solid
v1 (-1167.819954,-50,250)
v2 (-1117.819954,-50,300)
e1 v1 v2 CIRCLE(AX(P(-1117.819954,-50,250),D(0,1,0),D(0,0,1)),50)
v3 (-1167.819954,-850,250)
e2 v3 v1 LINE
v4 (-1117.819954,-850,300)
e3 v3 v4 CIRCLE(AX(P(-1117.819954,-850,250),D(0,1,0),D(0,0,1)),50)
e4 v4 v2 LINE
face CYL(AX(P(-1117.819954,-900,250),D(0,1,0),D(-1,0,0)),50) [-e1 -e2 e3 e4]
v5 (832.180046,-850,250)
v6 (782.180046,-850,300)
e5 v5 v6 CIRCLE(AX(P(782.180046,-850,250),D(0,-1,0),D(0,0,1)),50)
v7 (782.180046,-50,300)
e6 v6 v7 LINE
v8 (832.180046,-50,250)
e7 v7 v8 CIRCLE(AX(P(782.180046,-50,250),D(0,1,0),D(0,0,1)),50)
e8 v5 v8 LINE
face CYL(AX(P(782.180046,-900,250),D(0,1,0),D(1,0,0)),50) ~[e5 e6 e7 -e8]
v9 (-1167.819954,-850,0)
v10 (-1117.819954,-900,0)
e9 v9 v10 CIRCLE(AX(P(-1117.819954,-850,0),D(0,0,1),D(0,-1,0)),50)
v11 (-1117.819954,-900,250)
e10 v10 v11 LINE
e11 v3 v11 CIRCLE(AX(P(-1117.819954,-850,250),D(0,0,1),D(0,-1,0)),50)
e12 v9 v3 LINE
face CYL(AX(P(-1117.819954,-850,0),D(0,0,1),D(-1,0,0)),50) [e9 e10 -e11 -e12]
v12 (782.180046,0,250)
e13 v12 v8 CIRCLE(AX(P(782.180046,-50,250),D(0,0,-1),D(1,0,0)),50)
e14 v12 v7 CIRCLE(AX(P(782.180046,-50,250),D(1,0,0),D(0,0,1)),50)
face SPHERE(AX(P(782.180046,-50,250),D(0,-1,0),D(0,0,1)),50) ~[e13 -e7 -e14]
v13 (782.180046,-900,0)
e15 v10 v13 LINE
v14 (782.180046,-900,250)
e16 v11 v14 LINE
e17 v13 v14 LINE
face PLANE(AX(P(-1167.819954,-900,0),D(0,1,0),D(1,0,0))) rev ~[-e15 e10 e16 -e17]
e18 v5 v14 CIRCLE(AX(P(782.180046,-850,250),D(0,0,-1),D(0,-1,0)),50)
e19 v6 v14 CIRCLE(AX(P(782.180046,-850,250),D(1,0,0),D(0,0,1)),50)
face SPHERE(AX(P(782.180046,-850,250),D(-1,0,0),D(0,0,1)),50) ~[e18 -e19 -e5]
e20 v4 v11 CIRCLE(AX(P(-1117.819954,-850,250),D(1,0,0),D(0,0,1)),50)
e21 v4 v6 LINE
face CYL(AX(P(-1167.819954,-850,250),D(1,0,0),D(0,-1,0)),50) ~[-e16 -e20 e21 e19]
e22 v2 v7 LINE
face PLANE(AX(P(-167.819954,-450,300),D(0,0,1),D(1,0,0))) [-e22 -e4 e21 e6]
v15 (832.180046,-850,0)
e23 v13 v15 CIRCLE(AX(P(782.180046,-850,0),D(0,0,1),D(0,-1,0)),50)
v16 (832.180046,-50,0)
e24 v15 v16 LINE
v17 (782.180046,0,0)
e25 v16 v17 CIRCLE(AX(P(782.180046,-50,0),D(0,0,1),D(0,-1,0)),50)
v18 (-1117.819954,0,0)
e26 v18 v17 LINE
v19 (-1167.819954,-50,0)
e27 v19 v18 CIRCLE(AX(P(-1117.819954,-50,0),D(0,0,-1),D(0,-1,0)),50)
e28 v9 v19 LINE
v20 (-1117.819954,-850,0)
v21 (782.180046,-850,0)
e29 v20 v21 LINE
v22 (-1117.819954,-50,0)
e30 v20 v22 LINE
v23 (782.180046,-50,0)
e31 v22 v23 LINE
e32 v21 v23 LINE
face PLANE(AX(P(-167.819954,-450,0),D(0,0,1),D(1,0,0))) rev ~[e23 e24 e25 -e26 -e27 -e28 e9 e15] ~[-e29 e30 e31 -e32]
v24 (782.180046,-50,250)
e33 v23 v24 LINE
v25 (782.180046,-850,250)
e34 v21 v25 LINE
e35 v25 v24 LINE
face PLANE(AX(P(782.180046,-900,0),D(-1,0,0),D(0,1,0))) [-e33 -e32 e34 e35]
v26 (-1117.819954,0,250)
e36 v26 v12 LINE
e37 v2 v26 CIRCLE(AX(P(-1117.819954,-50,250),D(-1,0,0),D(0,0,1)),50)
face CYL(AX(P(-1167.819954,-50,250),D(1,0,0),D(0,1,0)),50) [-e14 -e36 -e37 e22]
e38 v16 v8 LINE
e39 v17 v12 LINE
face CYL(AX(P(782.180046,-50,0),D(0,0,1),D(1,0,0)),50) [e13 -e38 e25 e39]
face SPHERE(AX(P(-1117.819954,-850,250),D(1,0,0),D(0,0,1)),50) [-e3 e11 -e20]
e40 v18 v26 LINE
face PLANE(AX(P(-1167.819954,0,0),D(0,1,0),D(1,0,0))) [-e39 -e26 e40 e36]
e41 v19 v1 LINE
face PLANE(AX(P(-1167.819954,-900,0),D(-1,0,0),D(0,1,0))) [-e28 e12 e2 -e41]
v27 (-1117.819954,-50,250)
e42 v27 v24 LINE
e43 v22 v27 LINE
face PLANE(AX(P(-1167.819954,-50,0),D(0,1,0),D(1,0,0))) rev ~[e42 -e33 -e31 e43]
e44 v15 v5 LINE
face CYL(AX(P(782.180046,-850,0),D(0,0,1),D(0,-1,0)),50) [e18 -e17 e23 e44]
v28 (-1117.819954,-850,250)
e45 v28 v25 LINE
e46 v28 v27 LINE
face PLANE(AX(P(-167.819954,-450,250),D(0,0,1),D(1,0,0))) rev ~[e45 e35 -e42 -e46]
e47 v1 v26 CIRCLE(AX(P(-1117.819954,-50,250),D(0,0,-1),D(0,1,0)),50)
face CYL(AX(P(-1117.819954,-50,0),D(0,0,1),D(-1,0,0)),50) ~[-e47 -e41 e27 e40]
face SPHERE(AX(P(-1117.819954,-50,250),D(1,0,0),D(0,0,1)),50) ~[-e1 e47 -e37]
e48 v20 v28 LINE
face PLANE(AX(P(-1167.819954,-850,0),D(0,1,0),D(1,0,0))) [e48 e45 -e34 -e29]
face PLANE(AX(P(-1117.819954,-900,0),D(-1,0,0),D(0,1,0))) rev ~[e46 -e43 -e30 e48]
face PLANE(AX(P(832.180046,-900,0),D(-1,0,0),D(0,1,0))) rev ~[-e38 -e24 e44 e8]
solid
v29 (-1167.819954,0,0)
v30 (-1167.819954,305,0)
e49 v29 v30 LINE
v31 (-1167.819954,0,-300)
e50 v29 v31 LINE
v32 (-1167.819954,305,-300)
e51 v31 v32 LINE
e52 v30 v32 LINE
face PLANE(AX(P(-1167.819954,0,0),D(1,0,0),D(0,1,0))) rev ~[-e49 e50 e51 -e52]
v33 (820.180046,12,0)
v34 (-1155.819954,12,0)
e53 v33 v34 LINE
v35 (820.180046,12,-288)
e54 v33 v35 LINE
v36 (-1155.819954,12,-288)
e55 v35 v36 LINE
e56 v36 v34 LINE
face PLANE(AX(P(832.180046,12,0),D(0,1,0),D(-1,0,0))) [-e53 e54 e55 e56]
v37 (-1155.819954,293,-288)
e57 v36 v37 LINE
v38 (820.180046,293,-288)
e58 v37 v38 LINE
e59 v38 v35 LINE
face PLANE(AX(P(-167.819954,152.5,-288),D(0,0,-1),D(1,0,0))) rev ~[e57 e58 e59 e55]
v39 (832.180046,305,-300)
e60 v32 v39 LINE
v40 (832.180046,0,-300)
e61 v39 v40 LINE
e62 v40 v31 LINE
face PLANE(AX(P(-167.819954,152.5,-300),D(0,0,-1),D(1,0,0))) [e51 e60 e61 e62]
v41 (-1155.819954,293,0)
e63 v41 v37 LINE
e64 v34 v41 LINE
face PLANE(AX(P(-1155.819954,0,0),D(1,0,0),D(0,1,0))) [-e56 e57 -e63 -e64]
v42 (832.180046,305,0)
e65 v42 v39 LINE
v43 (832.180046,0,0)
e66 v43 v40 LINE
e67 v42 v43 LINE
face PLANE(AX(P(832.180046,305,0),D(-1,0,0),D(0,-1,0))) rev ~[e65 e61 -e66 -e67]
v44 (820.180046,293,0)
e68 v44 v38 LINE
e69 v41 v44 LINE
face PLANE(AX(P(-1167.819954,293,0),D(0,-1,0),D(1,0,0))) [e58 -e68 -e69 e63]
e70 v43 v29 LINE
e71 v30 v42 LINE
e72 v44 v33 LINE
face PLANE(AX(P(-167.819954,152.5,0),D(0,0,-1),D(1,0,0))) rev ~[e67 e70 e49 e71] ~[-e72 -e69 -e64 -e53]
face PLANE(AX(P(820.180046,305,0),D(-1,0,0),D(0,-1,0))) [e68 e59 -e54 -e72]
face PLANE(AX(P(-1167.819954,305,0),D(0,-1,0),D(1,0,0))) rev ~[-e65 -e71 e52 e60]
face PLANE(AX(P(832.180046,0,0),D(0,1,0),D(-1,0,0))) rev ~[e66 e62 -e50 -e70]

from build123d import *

# Parameters (mm, degrees)
F0_W     = 2000
F0_H     = 900
F1_DEPTH = 300
F2_R     = 50
F3_T     = 50
F5_DEPTH = 300
F6_T     = -12


# Not quite as in the source:
# - a shell that OpenCascade refuses in one call is made with other operations: the cavity is built on its own and cut out


with BuildPart() as f1:
    # F0 (on Top) → F1 (new body)
    with BuildSketch(Plane.XY):
        with Locations((-167.8199538224, -450)):
            Rectangle(F0_W, F0_H)
    extrude(amount=F1_DEPTH)

    # F2
    f2_edges = [f1.edges().sort_by_distance(p)[0] for p in [
        (-167.819954, -900, 300),
        (832.180046, -450, 300),
        (-167.819954, 0, 300),
        (-1167.819954, -450, 300),
        (-1167.819954, -900, 150),
        (832.180046, -900, 150),
        (832.180046, 0, 150),
        (-1167.819954, 0, 150),
    ]]
    fillet(f2_edges, radius=F2_R)

    # F3: shell of thickness 50, made by hand


with BuildPart() as f3_core1:
    # F3_t2: copy of F1
    add(f1.part)

    # the walls: a layer under each face that stays
    f3_faces = [f3_core1.faces().sort_by_distance(p)[0] for p in [
        (-167.8199538224, 0, 125),
        (832.1800461776, -450, 125),
        (-1167.8199538224, -450, 125),
        (-167.8199538224, -900, 125),
        (-167.8199538224, -450, 300),
    ]]
    thicken(f3_faces, amount=-F3_T, mode=Mode.SUBTRACT)


with BuildPart() as f1_1:
    add(f1.part)

    # what is left inside the walls is the cavity
    f3_cavity = [f3_core1.part.solids().sort_by_distance(p)[0] for p in [
        (-167.819954, -583.333333, 0.5),
    ]]
    add(f3_cavity, mode=Mode.SUBTRACT)


with BuildPart() as f5:
    # F4 (on face) → F5 (new body)
    with BuildSketch(Plane(origin=(0, 0, 0), x_dir=(1, 0, 0), z_dir=(0, 0, -1))):
        Polygon((782.1800461776, 0), (-1117.8199538224, 0), (-1167.8199538224, 0), (-1167.8199538224, -305), (832.1800461776, -305), (832.1800461776, 0), align=None)
    extrude(amount=F5_DEPTH)

    # F6
    f6_openings = [f5.faces().sort_by_distance(p)[0] for p in [
        (-167.819954, 152.5, 0),
    ]]
    offset(amount=F6_T, openings=f6_openings)


solid = Compound([f1_1.part, f5.part])
